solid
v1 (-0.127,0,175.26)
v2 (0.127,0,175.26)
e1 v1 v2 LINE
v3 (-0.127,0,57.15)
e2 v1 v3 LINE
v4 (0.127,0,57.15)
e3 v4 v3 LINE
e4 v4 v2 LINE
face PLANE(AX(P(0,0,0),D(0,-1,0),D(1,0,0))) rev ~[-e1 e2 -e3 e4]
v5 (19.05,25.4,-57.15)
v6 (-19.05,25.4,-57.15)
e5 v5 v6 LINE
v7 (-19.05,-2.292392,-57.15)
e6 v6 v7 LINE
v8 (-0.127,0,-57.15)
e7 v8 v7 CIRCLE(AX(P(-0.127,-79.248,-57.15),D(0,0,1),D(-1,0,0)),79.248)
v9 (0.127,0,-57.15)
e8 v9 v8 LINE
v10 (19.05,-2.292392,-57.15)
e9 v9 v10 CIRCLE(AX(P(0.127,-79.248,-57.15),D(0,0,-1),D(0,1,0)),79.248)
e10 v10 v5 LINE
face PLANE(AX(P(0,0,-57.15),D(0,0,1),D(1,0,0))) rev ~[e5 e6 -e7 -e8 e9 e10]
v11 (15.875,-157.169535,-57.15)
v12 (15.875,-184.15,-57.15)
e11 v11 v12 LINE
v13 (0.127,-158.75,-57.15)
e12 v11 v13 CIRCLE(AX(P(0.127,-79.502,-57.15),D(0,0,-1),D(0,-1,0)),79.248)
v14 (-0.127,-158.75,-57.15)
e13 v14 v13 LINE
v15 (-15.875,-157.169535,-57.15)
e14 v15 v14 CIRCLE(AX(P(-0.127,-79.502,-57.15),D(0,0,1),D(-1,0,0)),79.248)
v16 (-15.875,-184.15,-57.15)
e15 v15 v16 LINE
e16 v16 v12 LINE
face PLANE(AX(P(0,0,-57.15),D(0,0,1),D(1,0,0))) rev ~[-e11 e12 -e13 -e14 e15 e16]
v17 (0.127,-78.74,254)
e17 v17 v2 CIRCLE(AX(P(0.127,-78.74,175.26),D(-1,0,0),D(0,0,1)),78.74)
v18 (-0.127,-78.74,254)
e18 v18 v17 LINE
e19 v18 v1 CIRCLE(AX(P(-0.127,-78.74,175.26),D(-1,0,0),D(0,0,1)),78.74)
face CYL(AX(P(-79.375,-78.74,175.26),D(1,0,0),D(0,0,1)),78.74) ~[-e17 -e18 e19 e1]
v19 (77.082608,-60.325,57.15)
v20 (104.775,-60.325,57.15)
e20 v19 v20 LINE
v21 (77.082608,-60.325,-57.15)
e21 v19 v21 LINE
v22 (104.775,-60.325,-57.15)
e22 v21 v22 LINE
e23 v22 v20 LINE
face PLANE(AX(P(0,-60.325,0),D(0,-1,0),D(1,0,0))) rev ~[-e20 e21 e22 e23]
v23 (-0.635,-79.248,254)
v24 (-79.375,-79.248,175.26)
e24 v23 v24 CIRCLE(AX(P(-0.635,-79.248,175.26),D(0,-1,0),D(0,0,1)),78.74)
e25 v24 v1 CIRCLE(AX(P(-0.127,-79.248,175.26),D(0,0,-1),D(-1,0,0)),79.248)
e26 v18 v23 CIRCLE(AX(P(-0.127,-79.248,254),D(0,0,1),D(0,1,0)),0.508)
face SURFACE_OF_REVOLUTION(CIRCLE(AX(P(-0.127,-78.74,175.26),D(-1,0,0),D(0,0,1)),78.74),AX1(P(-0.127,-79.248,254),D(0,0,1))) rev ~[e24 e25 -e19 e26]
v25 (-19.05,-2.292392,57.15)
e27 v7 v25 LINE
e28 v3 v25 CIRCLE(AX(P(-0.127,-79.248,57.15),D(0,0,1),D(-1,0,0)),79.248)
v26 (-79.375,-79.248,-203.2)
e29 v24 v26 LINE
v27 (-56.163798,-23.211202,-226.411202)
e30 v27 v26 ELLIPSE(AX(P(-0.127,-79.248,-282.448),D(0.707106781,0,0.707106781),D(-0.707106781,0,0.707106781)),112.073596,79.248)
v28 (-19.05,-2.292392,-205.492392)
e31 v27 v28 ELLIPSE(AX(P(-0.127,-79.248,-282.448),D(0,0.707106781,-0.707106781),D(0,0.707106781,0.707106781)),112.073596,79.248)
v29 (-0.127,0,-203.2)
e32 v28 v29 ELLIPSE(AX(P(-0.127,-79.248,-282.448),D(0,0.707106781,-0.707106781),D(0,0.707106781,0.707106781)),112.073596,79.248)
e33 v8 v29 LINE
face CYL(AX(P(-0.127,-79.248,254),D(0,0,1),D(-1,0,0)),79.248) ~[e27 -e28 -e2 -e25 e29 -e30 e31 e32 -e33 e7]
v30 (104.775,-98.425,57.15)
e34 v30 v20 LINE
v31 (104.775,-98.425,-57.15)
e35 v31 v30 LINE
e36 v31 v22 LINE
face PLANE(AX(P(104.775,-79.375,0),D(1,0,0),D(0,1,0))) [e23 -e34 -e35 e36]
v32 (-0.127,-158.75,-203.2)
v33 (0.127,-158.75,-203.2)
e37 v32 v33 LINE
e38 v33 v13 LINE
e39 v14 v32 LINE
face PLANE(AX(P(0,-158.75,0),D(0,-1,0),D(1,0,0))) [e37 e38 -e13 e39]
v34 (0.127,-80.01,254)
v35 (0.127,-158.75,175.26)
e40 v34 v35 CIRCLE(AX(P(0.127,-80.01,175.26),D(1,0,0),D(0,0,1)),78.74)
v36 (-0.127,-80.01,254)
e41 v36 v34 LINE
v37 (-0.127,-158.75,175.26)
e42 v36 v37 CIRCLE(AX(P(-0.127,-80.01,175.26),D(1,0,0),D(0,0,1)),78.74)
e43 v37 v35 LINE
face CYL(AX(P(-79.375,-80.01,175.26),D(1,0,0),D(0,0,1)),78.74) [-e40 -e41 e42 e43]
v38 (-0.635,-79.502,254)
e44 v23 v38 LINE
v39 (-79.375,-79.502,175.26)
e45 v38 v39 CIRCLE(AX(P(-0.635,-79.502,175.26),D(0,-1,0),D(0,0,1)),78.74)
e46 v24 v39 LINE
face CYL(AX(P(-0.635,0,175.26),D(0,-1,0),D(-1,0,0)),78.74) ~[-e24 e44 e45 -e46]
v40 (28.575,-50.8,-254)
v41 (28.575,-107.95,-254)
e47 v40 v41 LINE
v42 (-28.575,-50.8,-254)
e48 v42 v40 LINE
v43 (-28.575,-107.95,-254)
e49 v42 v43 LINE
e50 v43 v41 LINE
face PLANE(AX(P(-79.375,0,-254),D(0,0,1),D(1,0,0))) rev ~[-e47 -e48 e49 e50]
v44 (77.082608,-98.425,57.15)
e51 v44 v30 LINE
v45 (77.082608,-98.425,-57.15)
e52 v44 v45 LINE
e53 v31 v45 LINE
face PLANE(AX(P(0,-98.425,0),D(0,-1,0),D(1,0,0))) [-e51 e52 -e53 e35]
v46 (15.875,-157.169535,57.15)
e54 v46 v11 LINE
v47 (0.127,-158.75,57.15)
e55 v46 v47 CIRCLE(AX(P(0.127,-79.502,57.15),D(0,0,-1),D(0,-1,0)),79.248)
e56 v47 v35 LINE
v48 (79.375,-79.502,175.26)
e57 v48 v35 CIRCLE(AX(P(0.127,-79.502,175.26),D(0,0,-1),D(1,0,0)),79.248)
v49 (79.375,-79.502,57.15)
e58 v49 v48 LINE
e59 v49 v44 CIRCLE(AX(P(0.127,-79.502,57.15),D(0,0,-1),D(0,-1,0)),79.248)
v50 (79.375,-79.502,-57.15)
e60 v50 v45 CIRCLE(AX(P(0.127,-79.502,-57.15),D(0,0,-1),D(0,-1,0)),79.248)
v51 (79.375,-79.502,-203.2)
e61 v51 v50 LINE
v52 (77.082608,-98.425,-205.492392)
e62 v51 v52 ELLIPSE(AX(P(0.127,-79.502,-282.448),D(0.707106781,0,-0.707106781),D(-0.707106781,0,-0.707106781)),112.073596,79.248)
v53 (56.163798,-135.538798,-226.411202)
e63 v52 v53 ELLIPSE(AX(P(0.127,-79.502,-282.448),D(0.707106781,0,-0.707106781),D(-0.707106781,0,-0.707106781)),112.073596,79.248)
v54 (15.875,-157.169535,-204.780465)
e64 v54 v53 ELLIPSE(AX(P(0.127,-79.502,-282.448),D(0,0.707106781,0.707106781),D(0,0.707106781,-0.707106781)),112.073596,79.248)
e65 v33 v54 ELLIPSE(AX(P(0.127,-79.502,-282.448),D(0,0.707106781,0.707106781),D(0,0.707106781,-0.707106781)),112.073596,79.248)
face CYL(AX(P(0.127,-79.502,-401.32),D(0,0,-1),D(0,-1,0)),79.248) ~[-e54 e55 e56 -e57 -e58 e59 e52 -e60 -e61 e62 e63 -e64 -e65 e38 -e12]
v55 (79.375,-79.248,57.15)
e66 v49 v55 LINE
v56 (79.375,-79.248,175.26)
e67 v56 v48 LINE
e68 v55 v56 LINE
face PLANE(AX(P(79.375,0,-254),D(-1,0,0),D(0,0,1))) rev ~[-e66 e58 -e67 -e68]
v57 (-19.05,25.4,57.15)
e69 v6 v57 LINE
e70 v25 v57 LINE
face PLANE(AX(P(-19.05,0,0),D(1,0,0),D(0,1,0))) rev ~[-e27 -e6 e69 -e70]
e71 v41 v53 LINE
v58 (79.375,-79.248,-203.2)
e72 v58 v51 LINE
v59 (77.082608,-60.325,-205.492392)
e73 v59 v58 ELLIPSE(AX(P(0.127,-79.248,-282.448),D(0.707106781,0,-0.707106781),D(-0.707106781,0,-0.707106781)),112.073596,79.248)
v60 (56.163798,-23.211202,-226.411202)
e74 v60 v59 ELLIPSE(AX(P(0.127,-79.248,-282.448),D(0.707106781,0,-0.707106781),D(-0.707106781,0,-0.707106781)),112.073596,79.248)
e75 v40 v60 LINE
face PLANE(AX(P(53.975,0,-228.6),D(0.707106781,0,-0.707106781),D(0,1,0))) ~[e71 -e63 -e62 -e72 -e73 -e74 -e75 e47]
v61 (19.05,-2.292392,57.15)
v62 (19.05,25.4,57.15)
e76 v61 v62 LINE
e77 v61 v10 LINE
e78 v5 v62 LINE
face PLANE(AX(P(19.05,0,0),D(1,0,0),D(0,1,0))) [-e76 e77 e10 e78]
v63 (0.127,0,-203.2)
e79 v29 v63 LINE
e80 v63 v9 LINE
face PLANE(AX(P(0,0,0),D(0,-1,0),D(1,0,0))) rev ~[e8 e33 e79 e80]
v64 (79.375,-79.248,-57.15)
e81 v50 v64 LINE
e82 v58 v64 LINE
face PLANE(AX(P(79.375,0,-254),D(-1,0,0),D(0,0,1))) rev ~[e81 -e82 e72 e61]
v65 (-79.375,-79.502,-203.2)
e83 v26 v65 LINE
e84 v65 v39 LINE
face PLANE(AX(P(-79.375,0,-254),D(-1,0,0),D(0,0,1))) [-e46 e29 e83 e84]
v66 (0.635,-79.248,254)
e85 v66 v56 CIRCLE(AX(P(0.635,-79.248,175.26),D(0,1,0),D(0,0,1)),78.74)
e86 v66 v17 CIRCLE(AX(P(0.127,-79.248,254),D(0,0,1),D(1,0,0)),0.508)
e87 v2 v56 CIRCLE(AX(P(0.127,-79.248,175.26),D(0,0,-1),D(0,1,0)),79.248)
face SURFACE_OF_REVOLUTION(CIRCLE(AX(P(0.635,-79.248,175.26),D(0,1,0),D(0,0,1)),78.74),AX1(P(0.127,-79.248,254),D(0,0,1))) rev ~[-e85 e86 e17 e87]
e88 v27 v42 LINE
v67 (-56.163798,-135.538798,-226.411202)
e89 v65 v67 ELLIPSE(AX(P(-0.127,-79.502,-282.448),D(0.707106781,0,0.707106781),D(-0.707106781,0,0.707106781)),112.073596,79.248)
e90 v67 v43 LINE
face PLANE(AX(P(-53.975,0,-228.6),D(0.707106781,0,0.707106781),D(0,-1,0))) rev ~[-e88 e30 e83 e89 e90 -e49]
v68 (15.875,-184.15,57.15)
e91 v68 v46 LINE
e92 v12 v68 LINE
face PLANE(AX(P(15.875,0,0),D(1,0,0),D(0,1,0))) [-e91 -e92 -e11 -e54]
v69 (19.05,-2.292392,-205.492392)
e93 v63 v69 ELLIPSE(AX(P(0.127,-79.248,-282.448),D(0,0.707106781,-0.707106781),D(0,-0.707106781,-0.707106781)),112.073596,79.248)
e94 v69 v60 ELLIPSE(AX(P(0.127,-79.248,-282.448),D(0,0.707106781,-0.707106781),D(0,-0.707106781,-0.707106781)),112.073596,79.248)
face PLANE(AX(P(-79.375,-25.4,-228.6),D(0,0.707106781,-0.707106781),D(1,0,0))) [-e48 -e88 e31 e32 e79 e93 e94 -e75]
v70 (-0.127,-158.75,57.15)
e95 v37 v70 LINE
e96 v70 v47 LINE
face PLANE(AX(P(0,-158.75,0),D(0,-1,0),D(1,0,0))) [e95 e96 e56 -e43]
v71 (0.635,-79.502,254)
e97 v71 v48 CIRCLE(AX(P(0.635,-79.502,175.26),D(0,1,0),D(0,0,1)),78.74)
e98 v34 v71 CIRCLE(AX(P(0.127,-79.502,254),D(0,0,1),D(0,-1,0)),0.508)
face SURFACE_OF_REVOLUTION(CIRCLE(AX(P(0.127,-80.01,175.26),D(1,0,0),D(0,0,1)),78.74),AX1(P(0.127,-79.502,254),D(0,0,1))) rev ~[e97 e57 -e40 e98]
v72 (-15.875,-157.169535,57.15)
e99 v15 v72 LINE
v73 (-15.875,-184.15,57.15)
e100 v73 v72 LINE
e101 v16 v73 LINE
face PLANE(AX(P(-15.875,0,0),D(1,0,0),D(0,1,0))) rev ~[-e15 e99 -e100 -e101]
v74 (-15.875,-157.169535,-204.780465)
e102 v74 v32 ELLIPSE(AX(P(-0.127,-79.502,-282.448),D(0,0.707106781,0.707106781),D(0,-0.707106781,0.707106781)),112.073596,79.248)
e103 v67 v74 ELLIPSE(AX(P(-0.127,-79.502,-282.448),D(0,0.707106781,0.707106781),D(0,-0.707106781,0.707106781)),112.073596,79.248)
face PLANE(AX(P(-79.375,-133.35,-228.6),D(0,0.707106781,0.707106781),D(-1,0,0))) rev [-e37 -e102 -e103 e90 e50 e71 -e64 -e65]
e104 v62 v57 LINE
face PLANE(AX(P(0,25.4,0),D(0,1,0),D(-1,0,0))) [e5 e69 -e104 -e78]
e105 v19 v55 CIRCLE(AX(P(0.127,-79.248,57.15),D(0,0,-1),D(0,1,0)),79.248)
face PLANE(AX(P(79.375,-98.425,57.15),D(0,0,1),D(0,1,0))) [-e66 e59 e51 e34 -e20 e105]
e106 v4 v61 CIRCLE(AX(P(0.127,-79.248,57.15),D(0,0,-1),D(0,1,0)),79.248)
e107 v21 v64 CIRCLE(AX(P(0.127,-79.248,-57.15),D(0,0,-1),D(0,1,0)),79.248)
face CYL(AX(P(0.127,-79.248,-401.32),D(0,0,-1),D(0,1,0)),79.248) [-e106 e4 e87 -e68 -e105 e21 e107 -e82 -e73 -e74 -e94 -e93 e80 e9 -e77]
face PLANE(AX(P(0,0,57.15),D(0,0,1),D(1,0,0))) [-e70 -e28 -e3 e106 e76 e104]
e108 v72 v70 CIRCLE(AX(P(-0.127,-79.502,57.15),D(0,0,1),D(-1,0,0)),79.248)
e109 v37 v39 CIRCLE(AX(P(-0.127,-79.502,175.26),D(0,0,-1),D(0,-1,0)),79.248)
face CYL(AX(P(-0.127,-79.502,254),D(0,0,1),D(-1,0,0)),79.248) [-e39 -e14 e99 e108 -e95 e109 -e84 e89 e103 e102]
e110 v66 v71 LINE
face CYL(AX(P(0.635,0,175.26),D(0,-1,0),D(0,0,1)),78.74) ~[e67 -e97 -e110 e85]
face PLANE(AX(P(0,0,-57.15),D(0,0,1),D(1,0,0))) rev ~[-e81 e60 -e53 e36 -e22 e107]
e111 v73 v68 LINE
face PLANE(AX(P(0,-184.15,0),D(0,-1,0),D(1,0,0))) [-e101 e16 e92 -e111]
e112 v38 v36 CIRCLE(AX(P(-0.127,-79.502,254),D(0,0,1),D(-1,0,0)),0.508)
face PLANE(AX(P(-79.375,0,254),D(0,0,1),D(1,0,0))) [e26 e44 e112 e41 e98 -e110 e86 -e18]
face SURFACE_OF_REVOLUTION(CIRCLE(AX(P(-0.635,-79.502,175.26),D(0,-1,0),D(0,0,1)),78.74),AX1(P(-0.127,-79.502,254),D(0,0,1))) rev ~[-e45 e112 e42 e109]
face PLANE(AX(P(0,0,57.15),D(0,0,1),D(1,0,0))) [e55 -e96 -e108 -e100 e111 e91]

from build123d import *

# Parameters (mm, degrees)
F0_W          = 158.75
F0_H          = 508
F1_DEPTH      = 158.75
F3_W          = 38.1
F3_H          = 114.3
F4_DEPTH      = 25.4
F2_W          = 31.75
F2_H          = 114.3
F5_DEPTH      = 25.4
F6_R          = 78.74
F7_SIZE       = 50.8
F8_W          = 38.1
F8_H          = 114.3
F9_DEPTH      = 25.4
F10_T2_ANGLE  = 90
F10_T4_ANGLE  = 90
F10_T6_ANGLE  = 90
F10_T8_ANGLE  = 90
F10_T12_DEPTH = 655.32
F10_T17_DEPTH = 655.32
F10_T23_DEPTH = 655.32
F10_T28_DEPTH = 655.32
F10_T33_DEPTH = 655.32
F10_T38_DEPTH = 655.32
F10_T43_DEPTH = 655.32
F10_T48_DEPTH = 655.32
F10_T53_DEPTH = 655.32
F10_T58_DEPTH = 655.32
F10_T63_DEPTH = 655.32
F10_T69_DEPTH = 655.32


# Not quite as in the source:
# - a fillet or chamfer that OpenCascade refuses, or shapes differently, is made with other operations: its cross-section is extruded or revolved along the edge and cut away or added


with BuildPart() as f1:
    # F0 (on Front) → F1 (new body)
    with BuildSketch(Plane.XZ):
        Rectangle(F0_W, F0_H)
    extrude(amount=F1_DEPTH)

    # F3 (on face) → F4 (join)
    with BuildSketch(Plane.YZ.offset(79.375)):
        with Locations((-79.375, 0)):
            Rectangle(F3_W, F3_H)
    extrude(amount=F4_DEPTH)

    # F2 (on face) → F5 (join)
    with BuildSketch(Plane.XZ.offset(158.75)):
        Rectangle(F2_W, F2_H)
    extrude(amount=F5_DEPTH)

    # F6
    f6_edges = [f1.edges().sort_by_distance(p)[0] for p in [
        (79.375, -79.375, 254),
        (-79.375, -79.375, 254),
        (0, 0, 254),
        (0, -158.75, 254),
    ]]
    fillet(f6_edges, radius=F6_R)

    # F7
    f7_edges = [f1.edges().sort_by_distance(p)[0] for p in [
        (-79.375, -79.375, -254),
        (79.375, -79.375, -254),
        (0, 0, -254),
        (0, -158.75, -254),
    ]]
    chamfer(f7_edges, length=F7_SIZE)

    # F8 (on face) → F9 (join)
    with BuildSketch(Plane(origin=(0, 0, 0), x_dir=(-1, 0, 0), z_dir=(0, 1, 0))):
        Rectangle(F8_W, F8_H)
    extrude(amount=F9_DEPTH)

    # F10: fillet of radius 79.248 on 4 edges, made by hand

    # F10_s1 → F10_t2 (revolve, cut)
    with BuildSketch(Plane.YZ.offset(0.127)):
        with BuildLine():
            ThreePointArc((-80.01, 254), (-135.6875879506, 230.9375879506), (-158.75, 175.26))
            Line((-158.75, 175.26), (-158.75, 254))
            Line((-158.75, 254), (-80.01, 254))
        make_face()
    revolve(axis=Axis((0.127, -79.502, 254), (0, 0, 1)), revolution_arc=F10_T2_ANGLE, mode=Mode.SUBTRACT)

    # F10_s3 → F10_t4 (revolve, cut)
    with BuildSketch(Plane.YZ.offset(-0.127)):
        with BuildLine():
            ThreePointArc((-78.74, 254), (-23.0624120494, 230.9375879506), (0, 175.26))
            Line((0, 175.26), (0, 254))
            Line((0, 254), (-78.74, 254))
        make_face()
    revolve(axis=Axis((-0.127, -79.248, 254), (0, 0, 1)), revolution_arc=F10_T4_ANGLE, mode=Mode.SUBTRACT)

    # F10_s5 → F10_t6 (revolve, cut)
    with BuildSketch(Plane.XZ.offset(79.502)):
        with BuildLine():
            ThreePointArc((-0.635, 254), (-56.3125879506, 230.9375879506), (-79.375, 175.26))
            Line((-79.375, 175.26), (-79.375, 254))
            Line((-79.375, 254), (-0.635, 254))
        make_face()
    revolve(axis=Axis((-0.127, -79.502, 254), (0, 0, 1)), revolution_arc=F10_T6_ANGLE, mode=Mode.SUBTRACT)

    # F10_s7 → F10_t8 (revolve, cut)
    with BuildSketch(Plane.XZ.offset(79.248)):
        with BuildLine():
            ThreePointArc((0.635, 254), (56.3125879506, 230.9375879506), (79.375, 175.26))
            Line((79.375, 175.26), (79.375, 254))
            Line((79.375, 254), (0.635, 254))
        make_face()
    revolve(axis=Axis((0.127, -79.248, 254), (0, 0, 1)), revolution_arc=F10_T8_ANGLE, mode=Mode.SUBTRACT)


with BuildPart() as f10_tool10:
    # F10_s11 → F10_t12 (new body)
    with BuildSketch(Plane.XY.offset(-401.32)):
        with BuildLine():
            ThreePointArc((0.127, 0), (56.1637981955, -23.2112018045), (79.375, -79.248))
            Line((79.375, -79.248), (79.375, 0))
            Line((79.375, 0), (0.127, 0))
        make_face()
    extrude(amount=F10_T12_DEPTH)

    split(bisect_by=Plane.XY.offset(-57.15), keep=Keep.BOTTOM)


with BuildPart() as f1_1:
    add(f1.part)

    # F10_t9: cut F10_tool10
    add(f10_tool10.part, mode=Mode.SUBTRACT)


with BuildPart() as f10_tool15:
    # F10_s16 → F10_t17 (new body)
    with BuildSketch(Plane.XY.offset(-401.32)):
        with BuildLine():
            ThreePointArc((0.127, 0), (56.1637981955, -23.2112018045), (79.375, -79.248))
            Line((79.375, -79.248), (79.375, 0))
            Line((79.375, 0), (0.127, 0))
        make_face()
    extrude(amount=F10_T17_DEPTH)

    split(bisect_by=Plane.YZ.offset(19.05), keep=Keep.TOP)

    split(bisect_by=Plane.XZ.offset(60.325), keep=Keep.BOTTOM)


with BuildPart() as f1_2:
    add(f1_1.part)

    # F10_t14: cut F10_tool15
    add(f10_tool15.part, mode=Mode.SUBTRACT)


with BuildPart() as f10_tool21:
    # F10_s22 → F10_t23 (new body)
    with BuildSketch(Plane.XY.offset(-401.32)):
        with BuildLine():
            ThreePointArc((0.127, 0), (56.1637981955, -23.2112018045), (79.375, -79.248))
            Line((79.375, -79.248), (79.375, 0))
            Line((79.375, 0), (0.127, 0))
        make_face()
    extrude(amount=F10_T23_DEPTH)

    split(bisect_by=Plane.XY.offset(57.15), keep=Keep.TOP)


with BuildPart() as f1_3:
    add(f1_2.part)

    # F10_t20: cut F10_tool21
    add(f10_tool21.part, mode=Mode.SUBTRACT)


with BuildPart() as f10_tool26:
    # F10_s27 → F10_t28 (new body)
    with BuildSketch(Plane.XY.offset(254)):
        with BuildLine():
            ThreePointArc((-79.375, -79.502), (-56.1637981955, -135.5387981955), (-0.127, -158.75))
            Line((-0.127, -158.75), (-79.375, -158.75))
            Line((-79.375, -158.75), (-79.375, -79.502))
        make_face()
    extrude(amount=-F10_T28_DEPTH)

    split(bisect_by=Plane.XY.offset(57.15), keep=Keep.TOP)


with BuildPart() as f1_4:
    add(f1_3.part)

    # F10_t25: cut F10_tool26
    add(f10_tool26.part, mode=Mode.SUBTRACT)


with BuildPart() as f10_tool31:
    # F10_s32 → F10_t33 (new body)
    with BuildSketch(Plane.XY.offset(254)):
        with BuildLine():
            ThreePointArc((-79.375, -79.502), (-56.1637981955, -135.5387981955), (-0.127, -158.75))
            Line((-0.127, -158.75), (-79.375, -158.75))
            Line((-79.375, -158.75), (-79.375, -79.502))
        make_face()
    extrude(amount=-F10_T33_DEPTH)

    split(bisect_by=Plane.YZ.offset(-15.875), keep=Keep.BOTTOM)


with BuildPart() as f1_5:
    add(f1_4.part)

    # F10_t30: cut F10_tool31
    add(f10_tool31.part, mode=Mode.SUBTRACT)


with BuildPart() as f10_tool36:
    # F10_s37 → F10_t38 (new body)
    with BuildSketch(Plane.XY.offset(254)):
        with BuildLine():
            ThreePointArc((-79.375, -79.502), (-56.1637981955, -135.5387981955), (-0.127, -158.75))
            Line((-0.127, -158.75), (-79.375, -158.75))
            Line((-79.375, -158.75), (-79.375, -79.502))
        make_face()
    extrude(amount=-F10_T38_DEPTH)

    split(bisect_by=Plane.XY.offset(-57.15), keep=Keep.BOTTOM)


with BuildPart() as f1_6:
    add(f1_5.part)

    # F10_t35: cut F10_tool36
    add(f10_tool36.part, mode=Mode.SUBTRACT)


with BuildPart() as f10_tool41:
    # F10_s42 → F10_t43 (new body)
    with BuildSketch(Plane.XY.offset(254)):
        with BuildLine():
            ThreePointArc((-79.375, -79.248), (-56.1637981955, -23.2112018045), (-0.127, 0))
            Line((-0.127, 0), (-79.375, 0))
            Line((-79.375, 0), (-79.375, -79.248))
        make_face()
    extrude(amount=-F10_T43_DEPTH)

    split(bisect_by=Plane.XY.offset(57.15), keep=Keep.TOP)


with BuildPart() as f1_7:
    add(f1_6.part)

    # F10_t40: cut F10_tool41
    add(f10_tool41.part, mode=Mode.SUBTRACT)


with BuildPart() as f10_tool46:
    # F10_s47 → F10_t48 (new body)
    with BuildSketch(Plane.XY.offset(254)):
        with BuildLine():
            ThreePointArc((-79.375, -79.248), (-56.1637981955, -23.2112018045), (-0.127, 0))
            Line((-0.127, 0), (-79.375, 0))
            Line((-79.375, 0), (-79.375, -79.248))
        make_face()
    extrude(amount=-F10_T48_DEPTH)

    split(bisect_by=Plane.YZ.offset(-19.05), keep=Keep.BOTTOM)


with BuildPart() as f1_8:
    add(f1_7.part)

    # F10_t45: cut F10_tool46
    add(f10_tool46.part, mode=Mode.SUBTRACT)


with BuildPart() as f10_tool51:
    # F10_s52 → F10_t53 (new body)
    with BuildSketch(Plane.XY.offset(254)):
        with BuildLine():
            ThreePointArc((-79.375, -79.248), (-56.1637981955, -23.2112018045), (-0.127, 0))
            Line((-0.127, 0), (-79.375, 0))
            Line((-79.375, 0), (-79.375, -79.248))
        make_face()
    extrude(amount=-F10_T53_DEPTH)

    split(bisect_by=Plane.XY.offset(-57.15), keep=Keep.BOTTOM)


with BuildPart() as f1_9:
    add(f1_8.part)

    # F10_t50: cut F10_tool51
    add(f10_tool51.part, mode=Mode.SUBTRACT)


with BuildPart() as f10_tool56:
    # F10_s57 → F10_t58 (new body)
    with BuildSketch(Plane.XY.offset(-401.32)):
        with BuildLine():
            ThreePointArc((0.127, -158.75), (56.1637981955, -135.5387981955), (79.375, -79.502))
            Line((79.375, -79.502), (79.375, -158.75))
            Line((79.375, -158.75), (0.127, -158.75))
        make_face()
    extrude(amount=F10_T58_DEPTH)

    split(bisect_by=Plane.XY.offset(-57.15), keep=Keep.BOTTOM)


with BuildPart() as f1_10:
    add(f1_9.part)

    # F10_t55: cut F10_tool56
    add(f10_tool56.part, mode=Mode.SUBTRACT)


with BuildPart() as f10_tool61:
    # F10_s62 → F10_t63 (new body)
    with BuildSketch(Plane.XY.offset(-401.32)):
        with BuildLine():
            ThreePointArc((0.127, -158.75), (56.1637981955, -135.5387981955), (79.375, -79.502))
            Line((79.375, -79.502), (79.375, -158.75))
            Line((79.375, -158.75), (0.127, -158.75))
        make_face()
    extrude(amount=F10_T63_DEPTH)

    split(bisect_by=Plane.YZ.offset(15.875), keep=Keep.TOP)

    split(bisect_by=Plane.XZ.offset(98.425), keep=Keep.TOP)


with BuildPart() as f1_11:
    add(f1_10.part)

    # F10_t60: cut F10_tool61
    add(f10_tool61.part, mode=Mode.SUBTRACT)


with BuildPart() as f10_tool67:
    # F10_s68 → F10_t69 (new body)
    with BuildSketch(Plane.XY.offset(-401.32)):
        with BuildLine():
            ThreePointArc((0.127, -158.75), (56.1637981955, -135.5387981955), (79.375, -79.502))
            Line((79.375, -79.502), (79.375, -158.75))
            Line((79.375, -158.75), (0.127, -158.75))
        make_face()
    extrude(amount=F10_T69_DEPTH)

    split(bisect_by=Plane.XY.offset(57.15), keep=Keep.TOP)


with BuildPart() as f1_12:
    add(f1_11.part)

    # F10_t66: cut F10_tool67
    add(f10_tool67.part, mode=Mode.SUBTRACT)


solid = f1_12.part
